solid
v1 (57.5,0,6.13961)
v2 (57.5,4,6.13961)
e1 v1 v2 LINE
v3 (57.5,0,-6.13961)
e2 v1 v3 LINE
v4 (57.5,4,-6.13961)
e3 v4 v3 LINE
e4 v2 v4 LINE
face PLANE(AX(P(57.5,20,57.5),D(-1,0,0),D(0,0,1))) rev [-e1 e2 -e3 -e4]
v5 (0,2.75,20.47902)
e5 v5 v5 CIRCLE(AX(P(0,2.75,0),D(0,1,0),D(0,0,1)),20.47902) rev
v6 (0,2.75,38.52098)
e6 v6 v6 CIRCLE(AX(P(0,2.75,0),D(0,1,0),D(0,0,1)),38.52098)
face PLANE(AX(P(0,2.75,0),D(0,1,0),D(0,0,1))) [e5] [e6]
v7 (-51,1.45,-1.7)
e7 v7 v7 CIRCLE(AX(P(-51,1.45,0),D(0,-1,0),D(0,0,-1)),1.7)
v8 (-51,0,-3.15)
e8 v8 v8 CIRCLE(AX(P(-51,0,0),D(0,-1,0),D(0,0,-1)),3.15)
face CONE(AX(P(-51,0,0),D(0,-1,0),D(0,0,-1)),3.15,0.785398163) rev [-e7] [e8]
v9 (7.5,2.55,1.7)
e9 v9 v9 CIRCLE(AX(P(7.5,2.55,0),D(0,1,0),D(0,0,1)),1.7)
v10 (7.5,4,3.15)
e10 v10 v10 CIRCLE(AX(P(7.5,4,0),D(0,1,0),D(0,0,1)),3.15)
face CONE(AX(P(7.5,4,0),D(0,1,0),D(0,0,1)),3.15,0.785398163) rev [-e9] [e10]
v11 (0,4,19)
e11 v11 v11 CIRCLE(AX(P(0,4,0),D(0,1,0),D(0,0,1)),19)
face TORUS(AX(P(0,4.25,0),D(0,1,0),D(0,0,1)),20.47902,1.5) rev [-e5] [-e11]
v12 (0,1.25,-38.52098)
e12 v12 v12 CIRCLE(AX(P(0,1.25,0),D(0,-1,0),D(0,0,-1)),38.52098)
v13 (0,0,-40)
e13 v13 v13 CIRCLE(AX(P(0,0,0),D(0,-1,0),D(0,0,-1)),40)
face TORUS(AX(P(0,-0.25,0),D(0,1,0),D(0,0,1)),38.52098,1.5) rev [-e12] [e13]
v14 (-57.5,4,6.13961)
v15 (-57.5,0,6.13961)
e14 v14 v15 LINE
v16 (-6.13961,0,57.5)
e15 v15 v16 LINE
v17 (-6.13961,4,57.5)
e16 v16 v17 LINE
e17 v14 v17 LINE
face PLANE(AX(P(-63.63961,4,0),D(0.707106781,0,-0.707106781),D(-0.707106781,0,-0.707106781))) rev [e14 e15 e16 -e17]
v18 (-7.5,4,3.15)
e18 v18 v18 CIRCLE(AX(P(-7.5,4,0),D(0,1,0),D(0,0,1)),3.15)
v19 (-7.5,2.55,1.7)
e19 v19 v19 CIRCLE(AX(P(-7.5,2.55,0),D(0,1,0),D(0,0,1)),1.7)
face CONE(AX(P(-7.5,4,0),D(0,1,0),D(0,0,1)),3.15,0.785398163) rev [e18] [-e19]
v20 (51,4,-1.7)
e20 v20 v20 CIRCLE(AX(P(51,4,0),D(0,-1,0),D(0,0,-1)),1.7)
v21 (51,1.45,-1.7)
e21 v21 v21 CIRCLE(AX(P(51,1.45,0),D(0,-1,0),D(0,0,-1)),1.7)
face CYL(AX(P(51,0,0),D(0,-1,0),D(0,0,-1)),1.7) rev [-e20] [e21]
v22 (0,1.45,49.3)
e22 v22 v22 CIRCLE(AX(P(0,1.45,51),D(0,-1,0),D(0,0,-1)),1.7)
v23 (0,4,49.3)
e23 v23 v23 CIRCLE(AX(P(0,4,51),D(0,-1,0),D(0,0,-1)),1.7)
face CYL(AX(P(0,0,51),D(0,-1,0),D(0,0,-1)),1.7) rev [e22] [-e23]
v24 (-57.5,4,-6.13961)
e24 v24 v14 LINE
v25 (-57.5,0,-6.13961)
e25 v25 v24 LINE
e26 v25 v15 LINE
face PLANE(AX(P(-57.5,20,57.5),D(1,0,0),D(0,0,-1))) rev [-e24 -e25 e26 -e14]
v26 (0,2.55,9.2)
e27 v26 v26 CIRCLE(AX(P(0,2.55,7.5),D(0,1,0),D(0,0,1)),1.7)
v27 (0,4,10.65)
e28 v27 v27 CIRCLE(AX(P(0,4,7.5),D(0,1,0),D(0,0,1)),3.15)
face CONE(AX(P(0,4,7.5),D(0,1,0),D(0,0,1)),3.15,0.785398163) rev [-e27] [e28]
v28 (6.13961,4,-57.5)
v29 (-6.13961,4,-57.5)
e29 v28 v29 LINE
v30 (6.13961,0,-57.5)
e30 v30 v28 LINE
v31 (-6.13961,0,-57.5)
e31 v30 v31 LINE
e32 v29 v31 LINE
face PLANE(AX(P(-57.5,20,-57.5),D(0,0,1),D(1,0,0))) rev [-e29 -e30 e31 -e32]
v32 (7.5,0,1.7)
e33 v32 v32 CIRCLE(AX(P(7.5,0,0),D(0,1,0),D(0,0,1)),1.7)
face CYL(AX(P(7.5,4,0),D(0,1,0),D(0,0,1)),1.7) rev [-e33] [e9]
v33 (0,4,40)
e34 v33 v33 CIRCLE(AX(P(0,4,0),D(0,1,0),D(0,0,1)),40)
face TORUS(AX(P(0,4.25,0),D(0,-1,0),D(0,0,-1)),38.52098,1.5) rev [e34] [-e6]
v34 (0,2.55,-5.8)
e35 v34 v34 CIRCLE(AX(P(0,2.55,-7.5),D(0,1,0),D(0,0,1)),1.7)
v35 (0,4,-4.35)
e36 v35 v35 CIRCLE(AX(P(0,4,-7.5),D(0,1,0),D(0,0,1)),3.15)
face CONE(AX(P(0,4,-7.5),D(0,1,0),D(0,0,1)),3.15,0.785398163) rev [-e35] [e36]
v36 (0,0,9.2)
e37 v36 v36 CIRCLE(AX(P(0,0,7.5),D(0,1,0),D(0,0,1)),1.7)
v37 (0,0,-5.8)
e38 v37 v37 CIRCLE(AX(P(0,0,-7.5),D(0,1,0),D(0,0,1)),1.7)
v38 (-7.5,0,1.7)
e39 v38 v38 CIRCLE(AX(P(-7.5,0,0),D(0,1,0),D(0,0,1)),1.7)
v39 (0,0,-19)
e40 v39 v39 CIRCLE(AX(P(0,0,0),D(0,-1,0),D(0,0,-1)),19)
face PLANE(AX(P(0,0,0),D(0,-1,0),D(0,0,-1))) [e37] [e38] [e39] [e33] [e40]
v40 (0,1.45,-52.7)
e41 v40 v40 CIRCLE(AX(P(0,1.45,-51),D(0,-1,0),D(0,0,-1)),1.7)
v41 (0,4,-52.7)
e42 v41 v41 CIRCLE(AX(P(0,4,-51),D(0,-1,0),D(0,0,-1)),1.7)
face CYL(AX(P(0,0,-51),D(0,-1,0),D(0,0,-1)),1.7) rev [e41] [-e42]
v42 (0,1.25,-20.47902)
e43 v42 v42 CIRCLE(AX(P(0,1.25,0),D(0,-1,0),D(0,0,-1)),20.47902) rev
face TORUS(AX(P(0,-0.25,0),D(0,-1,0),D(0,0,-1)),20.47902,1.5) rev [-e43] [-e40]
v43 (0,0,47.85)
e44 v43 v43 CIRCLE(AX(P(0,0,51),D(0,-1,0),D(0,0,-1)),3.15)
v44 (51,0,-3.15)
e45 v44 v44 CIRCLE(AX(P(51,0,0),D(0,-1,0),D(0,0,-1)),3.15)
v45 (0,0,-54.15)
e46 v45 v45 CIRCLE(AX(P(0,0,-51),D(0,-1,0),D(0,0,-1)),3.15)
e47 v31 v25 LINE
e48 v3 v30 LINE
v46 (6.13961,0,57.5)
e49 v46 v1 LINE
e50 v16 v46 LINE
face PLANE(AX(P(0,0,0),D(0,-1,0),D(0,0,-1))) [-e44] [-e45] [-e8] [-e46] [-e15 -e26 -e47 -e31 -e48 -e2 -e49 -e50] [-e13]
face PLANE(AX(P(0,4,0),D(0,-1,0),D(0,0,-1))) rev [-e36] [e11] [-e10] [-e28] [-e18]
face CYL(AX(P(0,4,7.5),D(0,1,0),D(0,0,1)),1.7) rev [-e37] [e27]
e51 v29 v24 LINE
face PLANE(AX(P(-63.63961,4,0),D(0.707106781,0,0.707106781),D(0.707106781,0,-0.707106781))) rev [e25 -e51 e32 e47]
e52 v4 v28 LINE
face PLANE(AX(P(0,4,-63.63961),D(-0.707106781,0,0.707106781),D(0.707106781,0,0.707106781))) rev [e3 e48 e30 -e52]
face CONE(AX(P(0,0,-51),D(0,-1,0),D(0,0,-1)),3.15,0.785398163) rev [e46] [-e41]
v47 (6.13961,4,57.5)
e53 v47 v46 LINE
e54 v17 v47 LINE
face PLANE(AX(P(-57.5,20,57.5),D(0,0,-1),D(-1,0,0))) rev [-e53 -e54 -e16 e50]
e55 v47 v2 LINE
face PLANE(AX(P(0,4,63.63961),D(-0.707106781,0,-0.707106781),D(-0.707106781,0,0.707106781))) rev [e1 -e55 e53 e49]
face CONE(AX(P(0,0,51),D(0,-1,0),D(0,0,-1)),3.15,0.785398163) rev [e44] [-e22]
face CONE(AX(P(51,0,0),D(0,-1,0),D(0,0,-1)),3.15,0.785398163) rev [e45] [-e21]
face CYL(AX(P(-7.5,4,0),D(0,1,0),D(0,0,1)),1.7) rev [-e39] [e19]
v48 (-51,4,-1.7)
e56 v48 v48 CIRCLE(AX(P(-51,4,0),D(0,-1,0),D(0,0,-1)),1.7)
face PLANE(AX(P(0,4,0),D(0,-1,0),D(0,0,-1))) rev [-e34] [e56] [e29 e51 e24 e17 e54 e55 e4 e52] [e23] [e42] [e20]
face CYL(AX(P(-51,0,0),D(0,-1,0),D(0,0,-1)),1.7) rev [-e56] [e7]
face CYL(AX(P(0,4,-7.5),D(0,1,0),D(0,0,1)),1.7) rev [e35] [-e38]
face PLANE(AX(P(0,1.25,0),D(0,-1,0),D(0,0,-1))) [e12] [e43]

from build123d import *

# Parameters (mm, degrees)
MOUNTING_BASE_DEPTH                             = 4
CSK_FOR_M3_FLAT_HEAD_MACHINE_SCREW2_D           = 3.4
CSK_FOR_M3_FLAT_HEAD_MACHINE_SCREW2_DEPTH       = 4
CSK_FOR_M3_FLAT_HEAD_MACHINE_SCREW2_CSINK_D     = 6.3
CSK_FOR_M3_FLAT_HEAD_MACHINE_SCREW2_CSINK_ANGLE = 90
CSK_FOR_M3_FLAT_HEAD_MACHINE_SCREW2_TIP         = 1.021463052
CSK_FOR_M3_FLAT_HEAD_MACHINE_SCREW1_D           = 3.4
CSK_FOR_M3_FLAT_HEAD_MACHINE_SCREW1_CSINK_D     = 6.3
CSK_FOR_M3_FLAT_HEAD_MACHINE_SCREW1_CSINK_ANGLE = 90
SKETCH12_OUTSIDE_W                              = 165.288
SKETCH12_OUTSIDE_H                              = 165.288
SKETCH12_OUTSIDE_W_2                            = 115
SKETCH12_OUTSIDE_H_2                            = 115
CUT_EXTRUDE2_DEPTH                              = 20
SKETCH19_R                                      = 40
SKETCH19_R_2                                    = 19
CUT_EXTRUDE4_DEPTH                              = 1.25
CUT_EXTRUDE5_START                              = -4
SKETCH19_3_R                                    = 40
SKETCH19_3_R_2                                  = 19
CUT_EXTRUDE5_DEPTH                              = 1.25
FILLET1_R                                       = 1.5


with BuildPart() as part:
    # Sketch1 → Mounting base (new body)
    with BuildSketch(Plane(origin=(0, 0, 0), x_dir=(1, 0, 0), z_dir=(0, 1, 0))):
        Polygon((-63.639610307, 0), (0, -63.639610307), (63.639610307, 0), (0, 63.639610307), align=None)
    extrude(amount=MOUNTING_BASE_DEPTH)

    # CSK for M3 Flat Head Machine Screw2
    with Locations(Plane(origin=(0, 0, 0), x_dir=(-1, 0, 0), z_dir=(0, -1, 0))):
        with Locations((51, 0), (0, -51), (-51, 0), (0, 51)):
            CounterSinkHole(CSK_FOR_M3_FLAT_HEAD_MACHINE_SCREW2_D / 2, CSK_FOR_M3_FLAT_HEAD_MACHINE_SCREW2_CSINK_D / 2, depth=CSK_FOR_M3_FLAT_HEAD_MACHINE_SCREW2_DEPTH, counter_sink_angle=CSK_FOR_M3_FLAT_HEAD_MACHINE_SCREW2_CSINK_ANGLE)
            with Locations((0, 0, -(CSK_FOR_M3_FLAT_HEAD_MACHINE_SCREW2_DEPTH + CSK_FOR_M3_FLAT_HEAD_MACHINE_SCREW2_TIP / 2))):  # 118° drill point
                Cone(0, CSK_FOR_M3_FLAT_HEAD_MACHINE_SCREW2_D / 2, CSK_FOR_M3_FLAT_HEAD_MACHINE_SCREW2_TIP, mode=Mode.SUBTRACT)

    # CSK for M3 Flat Head Machine Screw1 (through all)
    with Locations(Plane(origin=(0, 4, -7.5), x_dir=(0, 0, 1), z_dir=(0, 1, 0))):
        with Locations((0, 0), (7.5, 7.5), (15, 0), (7.5, -7.5)):
            CounterSinkHole(CSK_FOR_M3_FLAT_HEAD_MACHINE_SCREW1_D / 2, CSK_FOR_M3_FLAT_HEAD_MACHINE_SCREW1_CSINK_D / 2, counter_sink_angle=CSK_FOR_M3_FLAT_HEAD_MACHINE_SCREW1_CSINK_ANGLE)

    # Sketch12 outside → Cut-Extrude2 (cut)
    with BuildSketch(Plane(origin=(0, 0, 0), x_dir=(1, 0, 0), z_dir=(0, 1, 0))):
        Rectangle(SKETCH12_OUTSIDE_W, SKETCH12_OUTSIDE_H)
        Rectangle(SKETCH12_OUTSIDE_W_2, SKETCH12_OUTSIDE_H_2, mode=Mode.SUBTRACT)
    extrude(amount=CUT_EXTRUDE2_DEPTH, mode=Mode.SUBTRACT)

    # Sketch19 → Cut-Extrude4 (cut)
    with BuildSketch(Plane(origin=(0, 4, 0), x_dir=(1, 0, 0), z_dir=(0, 1, 0))):
        with Locations(Location((0, 0, 0), (0, 0, 270))):
            Circle(SKETCH19_R)
        with Locations(Location((0, 0, 0), (0, 0, 270))):
            Circle(SKETCH19_R_2, mode=Mode.SUBTRACT)
    extrude(amount=-CUT_EXTRUDE4_DEPTH, mode=Mode.SUBTRACT)

    # Sketch19<3> → Cut-Extrude5 (cut)
    with BuildSketch(Plane(origin=(0, 4, 0), x_dir=(1, 0, 0), z_dir=(0, 1, 0)).offset(CUT_EXTRUDE5_START)):
        with Locations(Location((0, 0, 0), (0, 0, 270))):
            Circle(SKETCH19_3_R)
        with Locations(Location((0, 0, 0), (0, 0, 270))):
            Circle(SKETCH19_3_R_2, mode=Mode.SUBTRACT)
    extrude(amount=CUT_EXTRUDE5_DEPTH, mode=Mode.SUBTRACT)

    # Fillet1
    # the kernel refuses this fillet: 1.5 mm, written as the material it adds along each edge
    with BuildSketch(Plane(origin=(0, 2.75, 0), x_dir=(0, 0, 1), z_dir=(-1, 0, 0))) as fillet1_piece_1:
        with BuildLine():
            CenterArc((38.520980054, 1.5), FILLET1_R, 270, 80.405931773)
            Line((38.520980054, 0), (38.520980054, -0.03))
            Line((38.520980054, -0.03), (40, -0.03))
            Line((40, -0.03), (40.03, 0))
            ThreePointArc((40.03, 0), (40.03, 0.625), (40.029580399, 1.245))
            Line((40.029580399, 1.245), (40, 1.25))
        make_face()
    revolve(axis=Axis((0, 2.75, 0), (0, 1, 0)))
    with BuildSketch(Plane(origin=(0, 2.75, 0), x_dir=(0, 0, 1), z_dir=(-1, 0, 0))) as fillet1_piece_2:
        with BuildLine():
            CenterArc((20.479019946, 1.5), FILLET1_R, 189.594068227, 80.405931773)
            Line((19, 1.25), (18.970419601, 1.245))
            ThreePointArc((18.970419601, 1.245), (18.97, 0.625), (18.97, 0))
            Line((18.97, 0), (19, -0.03))
            Line((19, -0.03), (20.479019946, -0.03))
            Line((20.479019946, -0.03), (20.479019946, 0))
        make_face()
    revolve(axis=Axis((0, 2.75, 0), (0, 1, 0)))
    with BuildSketch(Plane(origin=(0, 1.25, 0), x_dir=(0, 0, 1), z_dir=(-1, 0, 0))) as fillet1_piece_3:
        with BuildLine():
            CenterArc((38.520980054, -1.5), FILLET1_R, 9.594068227, 80.405931773)
            Line((38.520980054, 0), (38.520980054, 0.03))
            Line((38.520980054, 0.03), (40, 0.03))
            Line((40, 0.03), (40.03, 0))
            ThreePointArc((40.03, 0), (40.03, -0.625), (40.029580399, -1.245))
            Line((40.029580399, -1.245), (40, -1.25))
        make_face()
    revolve(axis=Axis((0, 1.25, 0), (0, 1, 0)))
    with BuildSketch(Plane(origin=(0, 1.25, 0), x_dir=(0, 0, 1), z_dir=(-1, 0, 0))) as fillet1_piece_4:
        with BuildLine():
            CenterArc((20.479019946, -1.5), FILLET1_R, 90, 80.405931773)
            Line((19, -1.25), (18.970419601, -1.245))
            ThreePointArc((18.970419601, -1.245), (18.97, -0.625), (18.97, 0))
            Line((18.97, 0), (19, 0.03))
            Line((19, 0.03), (20.479019946, 0.03))
            Line((20.479019946, 0.03), (20.479019946, 0))
        make_face()
    revolve(axis=Axis((0, 1.25, 0), (0, 1, 0)))


solid = part.part
